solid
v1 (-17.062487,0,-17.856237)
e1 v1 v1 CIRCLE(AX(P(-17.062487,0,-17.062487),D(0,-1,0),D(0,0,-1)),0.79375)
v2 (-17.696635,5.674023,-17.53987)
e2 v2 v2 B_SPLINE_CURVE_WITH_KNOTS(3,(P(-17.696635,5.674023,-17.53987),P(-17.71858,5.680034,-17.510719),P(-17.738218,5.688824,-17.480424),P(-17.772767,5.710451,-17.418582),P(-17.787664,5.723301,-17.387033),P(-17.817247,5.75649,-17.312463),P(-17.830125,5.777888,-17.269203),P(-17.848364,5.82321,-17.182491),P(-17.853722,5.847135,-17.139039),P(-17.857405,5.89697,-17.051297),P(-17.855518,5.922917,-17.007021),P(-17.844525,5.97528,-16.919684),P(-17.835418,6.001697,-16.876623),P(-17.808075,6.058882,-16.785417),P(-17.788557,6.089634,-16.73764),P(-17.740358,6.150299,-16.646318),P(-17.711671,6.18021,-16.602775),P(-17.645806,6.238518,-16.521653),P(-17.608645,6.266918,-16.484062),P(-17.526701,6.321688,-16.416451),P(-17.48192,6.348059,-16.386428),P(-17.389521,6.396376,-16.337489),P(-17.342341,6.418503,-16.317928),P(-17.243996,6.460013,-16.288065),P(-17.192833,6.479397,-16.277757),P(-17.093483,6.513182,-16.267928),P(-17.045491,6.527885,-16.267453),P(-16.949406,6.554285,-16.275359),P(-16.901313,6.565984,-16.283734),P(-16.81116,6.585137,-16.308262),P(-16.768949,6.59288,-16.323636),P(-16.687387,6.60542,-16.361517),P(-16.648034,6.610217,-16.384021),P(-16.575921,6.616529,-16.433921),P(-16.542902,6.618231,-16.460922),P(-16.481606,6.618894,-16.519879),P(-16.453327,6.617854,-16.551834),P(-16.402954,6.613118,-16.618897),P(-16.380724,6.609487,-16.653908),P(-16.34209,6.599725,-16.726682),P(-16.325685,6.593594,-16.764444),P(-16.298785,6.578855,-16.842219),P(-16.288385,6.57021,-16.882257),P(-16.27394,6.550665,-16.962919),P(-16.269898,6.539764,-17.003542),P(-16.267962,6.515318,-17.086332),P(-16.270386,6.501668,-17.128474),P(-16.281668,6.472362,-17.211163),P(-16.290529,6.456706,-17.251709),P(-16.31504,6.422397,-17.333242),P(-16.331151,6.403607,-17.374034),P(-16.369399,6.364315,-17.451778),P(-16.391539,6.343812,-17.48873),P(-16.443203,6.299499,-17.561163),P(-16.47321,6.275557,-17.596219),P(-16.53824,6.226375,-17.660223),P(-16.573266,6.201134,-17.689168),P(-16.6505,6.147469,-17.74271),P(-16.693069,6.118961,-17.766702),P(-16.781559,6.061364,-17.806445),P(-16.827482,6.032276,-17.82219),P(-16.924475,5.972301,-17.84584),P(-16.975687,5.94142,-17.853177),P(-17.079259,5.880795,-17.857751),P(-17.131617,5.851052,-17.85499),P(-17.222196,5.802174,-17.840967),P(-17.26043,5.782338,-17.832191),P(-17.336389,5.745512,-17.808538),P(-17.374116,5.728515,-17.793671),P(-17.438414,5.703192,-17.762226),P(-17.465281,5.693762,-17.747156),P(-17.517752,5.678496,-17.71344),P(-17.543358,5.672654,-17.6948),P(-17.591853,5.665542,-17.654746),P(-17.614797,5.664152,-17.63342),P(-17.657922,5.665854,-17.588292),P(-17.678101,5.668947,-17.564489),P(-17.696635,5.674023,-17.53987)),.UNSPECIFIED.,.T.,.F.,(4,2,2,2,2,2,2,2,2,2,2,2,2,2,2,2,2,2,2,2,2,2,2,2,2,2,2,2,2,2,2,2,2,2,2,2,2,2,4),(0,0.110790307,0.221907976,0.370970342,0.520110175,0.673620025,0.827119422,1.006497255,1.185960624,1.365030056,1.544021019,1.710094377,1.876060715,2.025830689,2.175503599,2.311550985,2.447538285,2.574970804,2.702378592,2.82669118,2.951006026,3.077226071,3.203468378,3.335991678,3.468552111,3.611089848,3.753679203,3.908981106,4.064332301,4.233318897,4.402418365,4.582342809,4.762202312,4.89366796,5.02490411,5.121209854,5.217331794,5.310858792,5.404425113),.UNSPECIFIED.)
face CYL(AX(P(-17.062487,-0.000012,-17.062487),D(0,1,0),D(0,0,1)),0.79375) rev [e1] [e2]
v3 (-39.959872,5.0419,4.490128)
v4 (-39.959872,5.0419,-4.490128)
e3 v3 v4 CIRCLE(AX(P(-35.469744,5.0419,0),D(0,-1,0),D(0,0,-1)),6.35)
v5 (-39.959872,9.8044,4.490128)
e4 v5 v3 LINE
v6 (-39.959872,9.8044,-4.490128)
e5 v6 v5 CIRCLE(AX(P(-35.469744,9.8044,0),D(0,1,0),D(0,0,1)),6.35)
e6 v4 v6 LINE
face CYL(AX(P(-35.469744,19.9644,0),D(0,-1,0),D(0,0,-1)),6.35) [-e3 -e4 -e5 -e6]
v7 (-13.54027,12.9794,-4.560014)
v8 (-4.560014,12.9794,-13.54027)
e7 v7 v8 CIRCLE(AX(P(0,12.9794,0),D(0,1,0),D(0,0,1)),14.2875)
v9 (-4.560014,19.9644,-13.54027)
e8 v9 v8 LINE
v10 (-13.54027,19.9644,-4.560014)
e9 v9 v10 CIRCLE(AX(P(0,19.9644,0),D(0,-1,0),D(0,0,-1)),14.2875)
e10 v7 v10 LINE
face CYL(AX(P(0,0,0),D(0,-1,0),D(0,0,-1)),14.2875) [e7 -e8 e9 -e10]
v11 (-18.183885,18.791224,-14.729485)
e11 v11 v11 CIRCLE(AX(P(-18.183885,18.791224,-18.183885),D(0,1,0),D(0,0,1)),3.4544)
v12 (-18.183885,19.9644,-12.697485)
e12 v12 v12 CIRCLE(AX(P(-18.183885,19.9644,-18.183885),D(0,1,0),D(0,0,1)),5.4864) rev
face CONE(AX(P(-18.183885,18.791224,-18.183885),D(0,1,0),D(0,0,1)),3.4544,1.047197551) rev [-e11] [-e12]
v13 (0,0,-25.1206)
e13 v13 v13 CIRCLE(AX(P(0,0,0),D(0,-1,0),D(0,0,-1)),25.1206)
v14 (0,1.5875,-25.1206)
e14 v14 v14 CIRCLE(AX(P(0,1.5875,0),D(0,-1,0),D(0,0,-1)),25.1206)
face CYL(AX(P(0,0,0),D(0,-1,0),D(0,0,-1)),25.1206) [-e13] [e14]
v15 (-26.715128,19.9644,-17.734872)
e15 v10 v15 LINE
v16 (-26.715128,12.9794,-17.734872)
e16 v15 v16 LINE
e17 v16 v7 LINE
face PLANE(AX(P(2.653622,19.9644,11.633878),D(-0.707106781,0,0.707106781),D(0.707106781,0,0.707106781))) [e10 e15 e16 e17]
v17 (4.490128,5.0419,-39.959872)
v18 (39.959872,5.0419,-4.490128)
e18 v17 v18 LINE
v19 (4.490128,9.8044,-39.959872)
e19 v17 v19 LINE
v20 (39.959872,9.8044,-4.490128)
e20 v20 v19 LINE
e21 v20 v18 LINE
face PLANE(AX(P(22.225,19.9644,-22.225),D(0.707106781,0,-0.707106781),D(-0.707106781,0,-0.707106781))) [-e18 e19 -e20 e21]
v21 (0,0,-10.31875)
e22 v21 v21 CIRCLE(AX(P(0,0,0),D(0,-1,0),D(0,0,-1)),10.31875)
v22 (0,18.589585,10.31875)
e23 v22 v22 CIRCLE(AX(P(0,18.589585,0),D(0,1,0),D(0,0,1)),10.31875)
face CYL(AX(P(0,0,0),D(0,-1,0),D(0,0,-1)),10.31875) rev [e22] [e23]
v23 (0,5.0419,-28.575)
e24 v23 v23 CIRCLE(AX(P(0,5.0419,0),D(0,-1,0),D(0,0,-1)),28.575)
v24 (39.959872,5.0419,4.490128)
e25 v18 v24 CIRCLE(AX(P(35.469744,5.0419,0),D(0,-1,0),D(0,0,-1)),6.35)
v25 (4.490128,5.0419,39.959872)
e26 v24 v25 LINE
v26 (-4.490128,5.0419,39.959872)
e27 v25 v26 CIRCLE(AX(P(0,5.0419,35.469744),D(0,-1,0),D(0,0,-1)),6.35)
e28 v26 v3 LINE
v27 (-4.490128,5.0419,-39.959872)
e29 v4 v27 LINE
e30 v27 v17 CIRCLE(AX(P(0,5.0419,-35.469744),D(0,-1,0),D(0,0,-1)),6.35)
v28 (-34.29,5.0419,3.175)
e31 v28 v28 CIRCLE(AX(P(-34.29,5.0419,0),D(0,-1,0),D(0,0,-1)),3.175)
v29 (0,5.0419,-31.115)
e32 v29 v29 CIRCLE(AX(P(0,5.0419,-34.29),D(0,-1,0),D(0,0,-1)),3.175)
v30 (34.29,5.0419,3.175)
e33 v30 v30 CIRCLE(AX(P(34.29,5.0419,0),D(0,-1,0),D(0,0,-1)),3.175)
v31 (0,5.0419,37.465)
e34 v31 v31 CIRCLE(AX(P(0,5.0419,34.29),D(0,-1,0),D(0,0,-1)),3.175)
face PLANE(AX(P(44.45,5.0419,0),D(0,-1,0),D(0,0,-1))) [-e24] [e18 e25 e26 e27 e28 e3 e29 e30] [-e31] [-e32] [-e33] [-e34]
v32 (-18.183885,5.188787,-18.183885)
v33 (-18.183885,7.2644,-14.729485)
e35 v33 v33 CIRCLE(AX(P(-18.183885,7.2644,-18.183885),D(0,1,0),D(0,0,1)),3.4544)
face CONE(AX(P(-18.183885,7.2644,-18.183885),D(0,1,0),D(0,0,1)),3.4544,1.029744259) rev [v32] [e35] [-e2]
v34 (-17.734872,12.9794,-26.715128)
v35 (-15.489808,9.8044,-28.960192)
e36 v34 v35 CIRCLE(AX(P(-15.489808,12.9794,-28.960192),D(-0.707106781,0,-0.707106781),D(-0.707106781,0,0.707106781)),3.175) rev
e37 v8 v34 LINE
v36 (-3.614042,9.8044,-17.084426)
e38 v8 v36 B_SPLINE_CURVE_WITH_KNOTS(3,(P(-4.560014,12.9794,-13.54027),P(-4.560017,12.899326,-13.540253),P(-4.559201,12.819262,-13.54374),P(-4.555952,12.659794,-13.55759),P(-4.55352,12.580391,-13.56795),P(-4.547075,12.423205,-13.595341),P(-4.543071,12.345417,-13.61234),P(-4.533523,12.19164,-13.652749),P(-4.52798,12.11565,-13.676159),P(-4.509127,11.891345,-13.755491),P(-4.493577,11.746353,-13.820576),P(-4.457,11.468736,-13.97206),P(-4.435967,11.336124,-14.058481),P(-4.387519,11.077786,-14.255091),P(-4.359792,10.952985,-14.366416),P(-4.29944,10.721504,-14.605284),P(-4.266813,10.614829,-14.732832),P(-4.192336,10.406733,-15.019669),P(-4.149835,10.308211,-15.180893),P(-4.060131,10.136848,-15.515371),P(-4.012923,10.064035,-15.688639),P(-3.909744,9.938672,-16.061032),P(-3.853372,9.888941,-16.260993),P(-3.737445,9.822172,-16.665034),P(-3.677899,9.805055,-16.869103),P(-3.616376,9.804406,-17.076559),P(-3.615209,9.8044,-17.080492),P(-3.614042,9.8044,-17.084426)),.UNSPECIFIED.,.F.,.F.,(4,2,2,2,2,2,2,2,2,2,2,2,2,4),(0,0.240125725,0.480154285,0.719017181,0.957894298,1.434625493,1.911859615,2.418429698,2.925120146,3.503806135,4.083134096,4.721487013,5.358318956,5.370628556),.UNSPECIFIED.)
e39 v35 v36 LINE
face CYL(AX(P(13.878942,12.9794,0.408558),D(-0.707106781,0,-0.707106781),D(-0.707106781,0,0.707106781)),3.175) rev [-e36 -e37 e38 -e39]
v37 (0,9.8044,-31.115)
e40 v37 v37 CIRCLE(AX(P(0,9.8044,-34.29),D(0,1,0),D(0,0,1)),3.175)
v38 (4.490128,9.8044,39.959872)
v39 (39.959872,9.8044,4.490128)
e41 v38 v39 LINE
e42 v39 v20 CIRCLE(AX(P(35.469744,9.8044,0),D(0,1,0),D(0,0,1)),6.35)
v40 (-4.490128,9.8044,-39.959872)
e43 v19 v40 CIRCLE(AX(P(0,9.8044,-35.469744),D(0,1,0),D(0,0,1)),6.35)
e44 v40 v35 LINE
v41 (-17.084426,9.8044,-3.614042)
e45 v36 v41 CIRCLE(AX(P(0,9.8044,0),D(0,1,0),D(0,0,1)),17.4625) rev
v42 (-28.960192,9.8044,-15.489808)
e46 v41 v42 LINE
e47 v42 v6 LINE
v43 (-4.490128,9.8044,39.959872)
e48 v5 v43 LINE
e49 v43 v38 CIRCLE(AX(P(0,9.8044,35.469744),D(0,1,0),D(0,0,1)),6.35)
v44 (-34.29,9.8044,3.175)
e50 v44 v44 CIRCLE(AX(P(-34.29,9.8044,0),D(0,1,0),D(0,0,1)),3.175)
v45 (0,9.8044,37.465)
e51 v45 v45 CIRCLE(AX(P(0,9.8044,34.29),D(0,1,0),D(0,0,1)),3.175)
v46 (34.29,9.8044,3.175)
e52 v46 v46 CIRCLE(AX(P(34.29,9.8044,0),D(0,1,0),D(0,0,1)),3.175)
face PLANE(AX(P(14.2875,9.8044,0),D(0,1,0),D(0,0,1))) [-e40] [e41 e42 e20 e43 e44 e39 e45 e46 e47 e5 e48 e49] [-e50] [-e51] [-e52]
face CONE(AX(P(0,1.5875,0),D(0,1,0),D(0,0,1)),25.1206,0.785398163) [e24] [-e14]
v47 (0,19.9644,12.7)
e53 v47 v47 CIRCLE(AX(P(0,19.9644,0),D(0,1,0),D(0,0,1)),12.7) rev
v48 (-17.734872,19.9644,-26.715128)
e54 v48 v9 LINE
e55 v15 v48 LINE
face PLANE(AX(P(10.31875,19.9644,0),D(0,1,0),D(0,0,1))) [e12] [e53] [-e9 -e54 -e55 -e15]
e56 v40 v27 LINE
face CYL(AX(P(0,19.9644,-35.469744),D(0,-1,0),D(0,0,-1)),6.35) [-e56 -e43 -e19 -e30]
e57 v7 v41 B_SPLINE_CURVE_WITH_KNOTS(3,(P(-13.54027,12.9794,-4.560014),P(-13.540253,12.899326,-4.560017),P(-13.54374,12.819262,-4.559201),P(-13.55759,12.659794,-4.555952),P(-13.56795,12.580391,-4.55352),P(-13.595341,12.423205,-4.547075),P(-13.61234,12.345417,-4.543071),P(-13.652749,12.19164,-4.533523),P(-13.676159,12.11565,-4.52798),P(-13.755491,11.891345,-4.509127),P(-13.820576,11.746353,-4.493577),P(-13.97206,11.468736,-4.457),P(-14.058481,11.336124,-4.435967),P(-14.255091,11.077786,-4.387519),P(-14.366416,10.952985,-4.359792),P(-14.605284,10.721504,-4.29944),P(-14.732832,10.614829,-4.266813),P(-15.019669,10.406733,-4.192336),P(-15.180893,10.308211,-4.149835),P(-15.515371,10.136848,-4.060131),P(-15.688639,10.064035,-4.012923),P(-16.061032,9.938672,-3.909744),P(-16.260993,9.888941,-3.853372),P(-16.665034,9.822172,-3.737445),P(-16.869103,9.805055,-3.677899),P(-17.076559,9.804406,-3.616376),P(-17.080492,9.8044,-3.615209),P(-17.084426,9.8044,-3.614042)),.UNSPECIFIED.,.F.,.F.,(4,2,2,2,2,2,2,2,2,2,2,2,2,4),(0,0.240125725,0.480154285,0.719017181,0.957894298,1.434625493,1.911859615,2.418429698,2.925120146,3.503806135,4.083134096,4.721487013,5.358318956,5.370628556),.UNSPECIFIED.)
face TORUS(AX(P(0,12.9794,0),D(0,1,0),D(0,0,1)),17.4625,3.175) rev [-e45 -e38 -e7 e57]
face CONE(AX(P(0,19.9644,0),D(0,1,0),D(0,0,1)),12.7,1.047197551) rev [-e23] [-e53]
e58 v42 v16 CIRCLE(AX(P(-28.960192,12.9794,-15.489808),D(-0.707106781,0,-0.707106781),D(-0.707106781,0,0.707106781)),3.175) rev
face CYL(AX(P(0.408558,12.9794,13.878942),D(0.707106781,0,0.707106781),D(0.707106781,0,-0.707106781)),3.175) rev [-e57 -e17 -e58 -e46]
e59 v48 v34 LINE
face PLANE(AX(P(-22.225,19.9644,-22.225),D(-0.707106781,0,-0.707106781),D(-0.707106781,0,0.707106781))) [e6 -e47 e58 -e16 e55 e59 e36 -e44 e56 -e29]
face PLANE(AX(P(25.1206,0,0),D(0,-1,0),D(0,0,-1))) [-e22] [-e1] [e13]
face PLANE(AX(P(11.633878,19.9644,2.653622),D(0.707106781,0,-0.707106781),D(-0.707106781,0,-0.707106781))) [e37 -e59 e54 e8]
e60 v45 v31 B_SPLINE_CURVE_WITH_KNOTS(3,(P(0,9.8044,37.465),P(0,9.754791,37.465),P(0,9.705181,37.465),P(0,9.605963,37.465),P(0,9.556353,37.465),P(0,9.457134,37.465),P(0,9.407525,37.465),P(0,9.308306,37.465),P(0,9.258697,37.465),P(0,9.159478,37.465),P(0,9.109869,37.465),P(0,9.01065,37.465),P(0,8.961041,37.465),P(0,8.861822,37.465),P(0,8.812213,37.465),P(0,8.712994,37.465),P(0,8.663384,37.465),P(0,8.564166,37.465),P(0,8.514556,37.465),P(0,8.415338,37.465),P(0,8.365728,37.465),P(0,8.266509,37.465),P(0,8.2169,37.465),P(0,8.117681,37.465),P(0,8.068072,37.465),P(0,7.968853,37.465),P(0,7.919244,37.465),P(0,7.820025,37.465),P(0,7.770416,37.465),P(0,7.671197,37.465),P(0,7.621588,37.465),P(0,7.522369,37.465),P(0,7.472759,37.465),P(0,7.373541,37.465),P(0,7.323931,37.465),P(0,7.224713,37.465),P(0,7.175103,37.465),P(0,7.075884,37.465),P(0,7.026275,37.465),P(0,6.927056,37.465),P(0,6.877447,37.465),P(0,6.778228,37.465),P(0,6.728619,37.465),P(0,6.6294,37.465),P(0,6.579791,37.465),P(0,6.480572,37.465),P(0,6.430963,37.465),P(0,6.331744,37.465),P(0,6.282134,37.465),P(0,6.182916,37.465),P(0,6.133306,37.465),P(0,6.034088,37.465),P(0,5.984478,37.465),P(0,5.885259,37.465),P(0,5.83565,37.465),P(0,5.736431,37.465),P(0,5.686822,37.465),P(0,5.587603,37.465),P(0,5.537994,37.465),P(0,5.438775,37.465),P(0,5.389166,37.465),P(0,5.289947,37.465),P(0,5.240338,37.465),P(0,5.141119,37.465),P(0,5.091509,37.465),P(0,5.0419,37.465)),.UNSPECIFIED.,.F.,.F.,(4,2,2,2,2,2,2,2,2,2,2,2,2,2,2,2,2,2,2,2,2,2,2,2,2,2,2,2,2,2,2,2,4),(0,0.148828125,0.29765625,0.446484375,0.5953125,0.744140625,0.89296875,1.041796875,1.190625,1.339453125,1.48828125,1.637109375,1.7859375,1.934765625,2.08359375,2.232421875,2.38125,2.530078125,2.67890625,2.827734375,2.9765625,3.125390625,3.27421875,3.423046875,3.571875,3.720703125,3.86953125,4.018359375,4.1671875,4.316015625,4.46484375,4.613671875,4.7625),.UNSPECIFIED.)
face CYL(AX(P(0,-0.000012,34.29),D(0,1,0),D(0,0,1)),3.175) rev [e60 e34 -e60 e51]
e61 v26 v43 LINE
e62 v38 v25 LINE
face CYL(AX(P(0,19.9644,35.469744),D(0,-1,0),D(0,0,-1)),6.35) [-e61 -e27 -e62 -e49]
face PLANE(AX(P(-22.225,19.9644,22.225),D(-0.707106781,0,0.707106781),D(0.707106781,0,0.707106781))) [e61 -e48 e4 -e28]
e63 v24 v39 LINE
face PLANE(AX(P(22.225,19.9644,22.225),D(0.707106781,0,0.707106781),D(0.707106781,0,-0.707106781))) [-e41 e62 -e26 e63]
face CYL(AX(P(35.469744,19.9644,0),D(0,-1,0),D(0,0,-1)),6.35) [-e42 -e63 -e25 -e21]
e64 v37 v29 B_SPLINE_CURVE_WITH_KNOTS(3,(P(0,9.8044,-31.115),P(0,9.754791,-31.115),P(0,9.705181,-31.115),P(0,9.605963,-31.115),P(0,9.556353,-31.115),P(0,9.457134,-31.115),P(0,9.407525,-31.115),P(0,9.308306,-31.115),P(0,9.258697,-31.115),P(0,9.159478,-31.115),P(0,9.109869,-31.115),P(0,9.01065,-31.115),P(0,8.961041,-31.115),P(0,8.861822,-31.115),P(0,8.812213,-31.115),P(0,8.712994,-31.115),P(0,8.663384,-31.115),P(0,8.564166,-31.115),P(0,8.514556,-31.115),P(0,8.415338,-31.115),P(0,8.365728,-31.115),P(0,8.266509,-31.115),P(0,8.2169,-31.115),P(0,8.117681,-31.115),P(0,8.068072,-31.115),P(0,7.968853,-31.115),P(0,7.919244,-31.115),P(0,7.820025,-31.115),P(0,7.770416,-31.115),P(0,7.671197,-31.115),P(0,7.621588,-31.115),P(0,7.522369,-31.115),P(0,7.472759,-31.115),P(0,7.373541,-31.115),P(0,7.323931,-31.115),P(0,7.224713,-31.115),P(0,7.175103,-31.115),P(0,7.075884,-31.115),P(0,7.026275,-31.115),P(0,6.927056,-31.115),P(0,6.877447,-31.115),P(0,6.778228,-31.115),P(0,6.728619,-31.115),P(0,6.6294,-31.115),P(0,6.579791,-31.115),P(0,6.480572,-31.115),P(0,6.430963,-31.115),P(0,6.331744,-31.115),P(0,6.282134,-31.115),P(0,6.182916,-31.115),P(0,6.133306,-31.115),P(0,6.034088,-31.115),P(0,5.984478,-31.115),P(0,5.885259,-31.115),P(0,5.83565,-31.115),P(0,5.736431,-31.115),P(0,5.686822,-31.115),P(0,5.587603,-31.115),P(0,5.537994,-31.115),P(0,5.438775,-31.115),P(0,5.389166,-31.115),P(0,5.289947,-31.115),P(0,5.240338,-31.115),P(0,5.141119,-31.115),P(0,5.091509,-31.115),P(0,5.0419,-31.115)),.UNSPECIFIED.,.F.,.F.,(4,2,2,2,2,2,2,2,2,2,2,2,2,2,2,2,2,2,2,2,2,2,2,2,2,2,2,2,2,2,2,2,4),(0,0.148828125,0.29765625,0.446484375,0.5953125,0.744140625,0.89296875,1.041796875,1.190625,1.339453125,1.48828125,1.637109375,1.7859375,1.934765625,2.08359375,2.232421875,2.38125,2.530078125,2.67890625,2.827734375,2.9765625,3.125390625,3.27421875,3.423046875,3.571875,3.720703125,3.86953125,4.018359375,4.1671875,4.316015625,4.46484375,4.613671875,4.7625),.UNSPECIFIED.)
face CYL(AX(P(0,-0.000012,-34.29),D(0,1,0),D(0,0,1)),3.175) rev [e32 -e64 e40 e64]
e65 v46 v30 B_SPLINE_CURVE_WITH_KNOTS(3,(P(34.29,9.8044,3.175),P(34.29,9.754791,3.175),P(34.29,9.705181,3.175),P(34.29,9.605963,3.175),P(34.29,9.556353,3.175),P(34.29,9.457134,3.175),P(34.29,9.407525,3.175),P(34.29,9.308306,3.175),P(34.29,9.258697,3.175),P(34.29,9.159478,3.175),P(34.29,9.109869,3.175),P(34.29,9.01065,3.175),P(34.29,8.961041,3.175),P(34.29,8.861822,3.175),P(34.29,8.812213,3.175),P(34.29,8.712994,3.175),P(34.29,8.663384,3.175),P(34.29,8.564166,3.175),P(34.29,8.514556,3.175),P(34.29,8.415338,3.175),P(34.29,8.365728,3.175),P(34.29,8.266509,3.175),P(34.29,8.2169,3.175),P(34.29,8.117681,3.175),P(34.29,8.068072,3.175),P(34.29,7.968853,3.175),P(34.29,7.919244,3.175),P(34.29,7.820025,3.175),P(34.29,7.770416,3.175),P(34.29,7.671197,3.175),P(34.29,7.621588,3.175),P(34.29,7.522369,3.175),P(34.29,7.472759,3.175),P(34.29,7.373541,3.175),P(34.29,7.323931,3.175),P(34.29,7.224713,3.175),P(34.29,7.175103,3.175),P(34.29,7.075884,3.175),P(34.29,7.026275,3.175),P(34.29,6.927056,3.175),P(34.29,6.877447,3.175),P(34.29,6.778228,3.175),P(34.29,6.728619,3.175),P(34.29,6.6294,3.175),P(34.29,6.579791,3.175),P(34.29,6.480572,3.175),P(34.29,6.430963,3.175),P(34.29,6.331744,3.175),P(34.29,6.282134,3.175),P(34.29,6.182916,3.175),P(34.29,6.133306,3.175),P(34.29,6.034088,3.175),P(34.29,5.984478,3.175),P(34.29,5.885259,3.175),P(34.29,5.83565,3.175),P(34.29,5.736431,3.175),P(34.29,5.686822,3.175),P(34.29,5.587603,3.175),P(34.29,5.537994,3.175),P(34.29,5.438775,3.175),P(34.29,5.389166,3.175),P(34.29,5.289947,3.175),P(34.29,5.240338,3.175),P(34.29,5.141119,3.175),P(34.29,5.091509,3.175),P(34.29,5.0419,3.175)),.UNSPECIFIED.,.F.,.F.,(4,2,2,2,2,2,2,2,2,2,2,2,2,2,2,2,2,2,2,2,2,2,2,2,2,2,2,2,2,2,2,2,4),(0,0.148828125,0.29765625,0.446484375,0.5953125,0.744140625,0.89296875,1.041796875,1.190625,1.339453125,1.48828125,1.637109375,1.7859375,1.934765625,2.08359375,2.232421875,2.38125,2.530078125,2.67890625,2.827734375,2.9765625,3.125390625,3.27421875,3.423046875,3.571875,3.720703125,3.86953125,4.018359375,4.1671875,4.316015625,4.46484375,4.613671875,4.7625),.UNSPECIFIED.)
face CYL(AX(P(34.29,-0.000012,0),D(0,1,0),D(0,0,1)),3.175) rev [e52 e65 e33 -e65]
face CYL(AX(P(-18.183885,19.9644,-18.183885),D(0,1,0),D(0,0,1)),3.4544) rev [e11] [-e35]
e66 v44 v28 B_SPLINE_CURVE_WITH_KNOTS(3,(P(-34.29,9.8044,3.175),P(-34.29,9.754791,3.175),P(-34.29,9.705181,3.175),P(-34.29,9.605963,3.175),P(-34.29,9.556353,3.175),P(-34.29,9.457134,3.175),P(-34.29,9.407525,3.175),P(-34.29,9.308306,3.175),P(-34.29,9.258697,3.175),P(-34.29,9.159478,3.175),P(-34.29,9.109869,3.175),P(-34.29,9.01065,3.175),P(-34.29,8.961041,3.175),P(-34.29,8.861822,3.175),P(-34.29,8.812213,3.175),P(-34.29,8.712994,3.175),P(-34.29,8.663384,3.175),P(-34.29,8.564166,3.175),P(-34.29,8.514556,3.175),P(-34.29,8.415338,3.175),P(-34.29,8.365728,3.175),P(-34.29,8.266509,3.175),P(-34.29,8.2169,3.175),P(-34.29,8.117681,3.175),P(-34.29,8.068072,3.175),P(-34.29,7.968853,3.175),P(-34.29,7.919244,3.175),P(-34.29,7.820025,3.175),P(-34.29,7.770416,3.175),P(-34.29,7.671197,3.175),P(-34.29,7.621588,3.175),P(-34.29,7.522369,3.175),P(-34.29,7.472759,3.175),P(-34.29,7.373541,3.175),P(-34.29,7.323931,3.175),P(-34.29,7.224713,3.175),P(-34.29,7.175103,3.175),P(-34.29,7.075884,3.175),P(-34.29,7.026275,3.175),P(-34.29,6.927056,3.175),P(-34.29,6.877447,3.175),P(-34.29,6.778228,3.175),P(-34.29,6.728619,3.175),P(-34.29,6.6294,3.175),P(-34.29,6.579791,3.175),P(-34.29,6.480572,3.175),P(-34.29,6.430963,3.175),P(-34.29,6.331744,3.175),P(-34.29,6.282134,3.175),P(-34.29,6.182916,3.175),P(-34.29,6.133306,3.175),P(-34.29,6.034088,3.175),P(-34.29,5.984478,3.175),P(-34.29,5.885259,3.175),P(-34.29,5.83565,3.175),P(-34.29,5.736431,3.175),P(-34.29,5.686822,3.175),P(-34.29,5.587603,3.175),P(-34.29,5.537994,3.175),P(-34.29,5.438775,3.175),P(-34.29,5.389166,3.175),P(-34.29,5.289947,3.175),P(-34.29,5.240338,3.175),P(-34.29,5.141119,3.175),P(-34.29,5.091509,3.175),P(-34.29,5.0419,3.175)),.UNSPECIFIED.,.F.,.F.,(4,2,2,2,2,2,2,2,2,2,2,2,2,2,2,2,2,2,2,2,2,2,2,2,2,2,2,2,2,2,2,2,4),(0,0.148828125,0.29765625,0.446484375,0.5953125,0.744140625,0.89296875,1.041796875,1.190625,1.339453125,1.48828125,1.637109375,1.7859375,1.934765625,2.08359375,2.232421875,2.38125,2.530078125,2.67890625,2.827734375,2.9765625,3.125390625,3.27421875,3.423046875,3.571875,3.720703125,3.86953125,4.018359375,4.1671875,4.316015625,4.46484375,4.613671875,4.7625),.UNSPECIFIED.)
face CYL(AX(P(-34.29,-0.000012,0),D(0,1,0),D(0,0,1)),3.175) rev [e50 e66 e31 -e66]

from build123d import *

# Parameters (mm, degrees)
CUT_EXTRUDE4_DEPTH           = 66.955911542
CUT_EXTRUDE4_DEPTH_BACK      = 66.955911542
SKETCH3_R                    = 3.175
FILLET3_R                    = 6.35
BOSS_EXTRUDE1_START          = 9.8044
BOSS_EXTRUDE1_DEPTH          = 10.16
FILLET2_R                    = 3.175
CHAMFER2_SIZE                = 2.38125
CHAMFER2_SIZE_2              = 1.374815329
CUT_EXTRUDE3_DEPTH           = 63.420823637
CUT_EXTRUDE3_DEPTH_BACK      = 63.420823637
SKETCH8_R                    = 0.79375
F_5_16_24_TAPPED_HOLE1_D     = 6.9088
F_5_16_24_TAPPED_HOLE1_DEPTH = 12.7
F_5_16_24_TAPPED_HOLE1_TIP   = 2.075612922
CHAMFER3_SIZE                = 2.032
CHAMFER3_SIZE2               = 1.173175747


with BuildPart() as part:
    # Sketch1 → Revolve1 (revolve)
    with BuildSketch(Plane.XY, mode=Mode.PRIVATE) as revolve1_sk:
        Polygon((10.31875, 19.9644), (14.2875, 19.9644), (14.2875, 9.8044), (44.45, 9.8044), (44.45, 5.0419), (28.575, 5.0419), (25.1206, 1.5875), (25.1206, 0), (10.31875, 0), align=None)
    revolve(revolve1_sk.sketch.rotate(Axis((0, 0, 0), (0, 1, 0)), 90), axis=Axis((0, 0, 0), (0, 1, 0)))

    # Sketch3 → Cut-Extrude4 (cut, two sides: drawn at the far end of the back side and taken through both)
    with BuildSketch(Plane(origin=(0, 0, 0), x_dir=(1, 0, 0), z_dir=(0, 1, 0)).offset(-CUT_EXTRUDE4_DEPTH_BACK)):
        with BuildLine():
            Line((0, -44.45), (-44.45, 0))
            ThreePointArc((-44.45, 0), (-31.430896424, -31.430896424), (0, -44.45))
        make_face()
        with BuildLine():
            Line((44.45, 0), (0, -44.45))
            ThreePointArc((0, -44.45), (31.430896424, -31.430896424), (44.45, 0))
        make_face()
        with BuildLine():
            ThreePointArc((44.45, 0), (31.430896424, 31.430896424), (0, 44.45))
            Line((0, 44.45), (44.45, 0))
        make_face()
        with BuildLine():
            ThreePointArc((0, 44.45), (-31.430896424, 31.430896424), (-44.45, 0))
            Line((-44.45, 0), (0, 44.45))
        make_face()
        with Locations(Location((-34.29, 0, 0), (0, 0, 270))):
            Circle(SKETCH3_R)
        with Locations(Location((0, 34.29, 0), (0, 0, 270))):
            Circle(SKETCH3_R)
        with Locations(Location((34.29, 0, 0), (0, 0, 270))):
            Circle(SKETCH3_R)
        with Locations(Location((0, -34.29, 0), (0, 0, 270))):
            Circle(SKETCH3_R)
    extrude(amount=CUT_EXTRUDE4_DEPTH + CUT_EXTRUDE4_DEPTH_BACK, mode=Mode.SUBTRACT)

    # Fillet3
    fillet3_edges = [part.edges().sort_by_distance(p)[0] for p in [
        (0, 7.42315, -44.45),
        (44.45, 7.42315, 0),
        (0, 7.42315, 44.45),
        (-44.45, 7.42315, 0),
    ]]
    fillet(fillet3_edges, radius=FILLET3_R)

    # Sketch4 → Boss-Extrude1 (add)
    with BuildSketch(Plane(origin=(0, 0, 0), x_dir=(1, 0, 0), z_dir=(0, 1, 0)).offset(BOSS_EXTRUDE1_START)):
        Polygon((-22.225, 22.225), (-26.715128061, 17.734871939), (-11.786586159, 2.806330038), (-2.806330038, 11.786586159), (-17.734871939, 26.715128061), align=None)
    extrude(amount=BOSS_EXTRUDE1_DEPTH)

    # Fillet2
    fillet2_edges = [part.edges().sort_by_distance(p)[0] for p in [
        (10.102788136, 9.8044, 10.102788136),
        (-11.147443158, 9.8044, -20.127699279),
        (-20.127699279, 9.8044, -11.147443158),
    ]]
    fillet(fillet2_edges, radius=FILLET2_R)

    # Chamfer2
    # the kernel refuses this chamfer: 2.38125, 1.374815329 mm, written as the material it takes off along each edge
    with BuildSketch(Plane(origin=(0, 19.9644, 0), x_dir=(0, 0, -1), z_dir=(1, 0, 0))) as chamfer2_piece_1:
        Polygon((10.31875 + CHAMFER2_SIZE, 0), (10.31875, -CHAMFER2_SIZE_2), (10.31875, 0), align=None)
    revolve(axis=Axis((0, 19.9644, 0), (0, 1, 0)), revolution_arc=45.000000179, mode=Mode.SUBTRACT)
    with BuildSketch(Plane(origin=(0, 19.9644, 0), x_dir=(-0.7071067833935745, 0, -0.7071067789795206), z_dir=(0.7071067789795206, 0, -0.7071067833935745))) as chamfer2_piece_2:
        Polygon((10.31875 + CHAMFER2_SIZE, 0), (10.31875, -CHAMFER2_SIZE_2), (10.31875, 0), align=None)
    revolve(axis=Axis((0, 19.9644, 0), (0, 1, 0)), revolution_arc=314.999999821, mode=Mode.SUBTRACT)

    # Sketch8 → Cut-Extrude3 (cut, two sides: drawn at the far end of the back side and taken through both)
    with BuildSketch(Plane(origin=(0, 0, 0), x_dir=(1, 0, 0), z_dir=(0, 1, 0)).offset(-CUT_EXTRUDE3_DEPTH_BACK)):
        with Locations(Location((-17.06248663, 17.06248663, 0), (0, 0, 270))):
            Circle(SKETCH8_R)
    extrude(amount=CUT_EXTRUDE3_DEPTH + CUT_EXTRUDE3_DEPTH_BACK, mode=Mode.SUBTRACT)

    # 5/16-24 Tapped Hole1
    with Locations(Plane(origin=(0, 19.9644, 0), x_dir=(1, 0, 0), z_dir=(0, 1, 0))):
        with Locations((-18.183884746, 18.183884746)):
            Hole(F_5_16_24_TAPPED_HOLE1_D / 2, depth=F_5_16_24_TAPPED_HOLE1_DEPTH)
            with Locations((0, 0, -(F_5_16_24_TAPPED_HOLE1_DEPTH + F_5_16_24_TAPPED_HOLE1_TIP / 2))):  # 118° drill point
                Cone(0, F_5_16_24_TAPPED_HOLE1_D / 2, F_5_16_24_TAPPED_HOLE1_TIP, mode=Mode.SUBTRACT)

    # Chamfer3
    chamfer3_edges = [part.edges().sort_by_distance(p)[0] for p in [
        (-14.729484746, 19.9644, -18.183884746),
    ]]
    chamfer3_side = [part.faces().sort_by_distance(p)[0] for p in [
        (-9.027932252, 19.9644, -9.027932252),
    ]]
    chamfer(chamfer3_edges, length=CHAMFER3_SIZE, length2=CHAMFER3_SIZE2, reference=chamfer3_side[0])


solid = part.part
